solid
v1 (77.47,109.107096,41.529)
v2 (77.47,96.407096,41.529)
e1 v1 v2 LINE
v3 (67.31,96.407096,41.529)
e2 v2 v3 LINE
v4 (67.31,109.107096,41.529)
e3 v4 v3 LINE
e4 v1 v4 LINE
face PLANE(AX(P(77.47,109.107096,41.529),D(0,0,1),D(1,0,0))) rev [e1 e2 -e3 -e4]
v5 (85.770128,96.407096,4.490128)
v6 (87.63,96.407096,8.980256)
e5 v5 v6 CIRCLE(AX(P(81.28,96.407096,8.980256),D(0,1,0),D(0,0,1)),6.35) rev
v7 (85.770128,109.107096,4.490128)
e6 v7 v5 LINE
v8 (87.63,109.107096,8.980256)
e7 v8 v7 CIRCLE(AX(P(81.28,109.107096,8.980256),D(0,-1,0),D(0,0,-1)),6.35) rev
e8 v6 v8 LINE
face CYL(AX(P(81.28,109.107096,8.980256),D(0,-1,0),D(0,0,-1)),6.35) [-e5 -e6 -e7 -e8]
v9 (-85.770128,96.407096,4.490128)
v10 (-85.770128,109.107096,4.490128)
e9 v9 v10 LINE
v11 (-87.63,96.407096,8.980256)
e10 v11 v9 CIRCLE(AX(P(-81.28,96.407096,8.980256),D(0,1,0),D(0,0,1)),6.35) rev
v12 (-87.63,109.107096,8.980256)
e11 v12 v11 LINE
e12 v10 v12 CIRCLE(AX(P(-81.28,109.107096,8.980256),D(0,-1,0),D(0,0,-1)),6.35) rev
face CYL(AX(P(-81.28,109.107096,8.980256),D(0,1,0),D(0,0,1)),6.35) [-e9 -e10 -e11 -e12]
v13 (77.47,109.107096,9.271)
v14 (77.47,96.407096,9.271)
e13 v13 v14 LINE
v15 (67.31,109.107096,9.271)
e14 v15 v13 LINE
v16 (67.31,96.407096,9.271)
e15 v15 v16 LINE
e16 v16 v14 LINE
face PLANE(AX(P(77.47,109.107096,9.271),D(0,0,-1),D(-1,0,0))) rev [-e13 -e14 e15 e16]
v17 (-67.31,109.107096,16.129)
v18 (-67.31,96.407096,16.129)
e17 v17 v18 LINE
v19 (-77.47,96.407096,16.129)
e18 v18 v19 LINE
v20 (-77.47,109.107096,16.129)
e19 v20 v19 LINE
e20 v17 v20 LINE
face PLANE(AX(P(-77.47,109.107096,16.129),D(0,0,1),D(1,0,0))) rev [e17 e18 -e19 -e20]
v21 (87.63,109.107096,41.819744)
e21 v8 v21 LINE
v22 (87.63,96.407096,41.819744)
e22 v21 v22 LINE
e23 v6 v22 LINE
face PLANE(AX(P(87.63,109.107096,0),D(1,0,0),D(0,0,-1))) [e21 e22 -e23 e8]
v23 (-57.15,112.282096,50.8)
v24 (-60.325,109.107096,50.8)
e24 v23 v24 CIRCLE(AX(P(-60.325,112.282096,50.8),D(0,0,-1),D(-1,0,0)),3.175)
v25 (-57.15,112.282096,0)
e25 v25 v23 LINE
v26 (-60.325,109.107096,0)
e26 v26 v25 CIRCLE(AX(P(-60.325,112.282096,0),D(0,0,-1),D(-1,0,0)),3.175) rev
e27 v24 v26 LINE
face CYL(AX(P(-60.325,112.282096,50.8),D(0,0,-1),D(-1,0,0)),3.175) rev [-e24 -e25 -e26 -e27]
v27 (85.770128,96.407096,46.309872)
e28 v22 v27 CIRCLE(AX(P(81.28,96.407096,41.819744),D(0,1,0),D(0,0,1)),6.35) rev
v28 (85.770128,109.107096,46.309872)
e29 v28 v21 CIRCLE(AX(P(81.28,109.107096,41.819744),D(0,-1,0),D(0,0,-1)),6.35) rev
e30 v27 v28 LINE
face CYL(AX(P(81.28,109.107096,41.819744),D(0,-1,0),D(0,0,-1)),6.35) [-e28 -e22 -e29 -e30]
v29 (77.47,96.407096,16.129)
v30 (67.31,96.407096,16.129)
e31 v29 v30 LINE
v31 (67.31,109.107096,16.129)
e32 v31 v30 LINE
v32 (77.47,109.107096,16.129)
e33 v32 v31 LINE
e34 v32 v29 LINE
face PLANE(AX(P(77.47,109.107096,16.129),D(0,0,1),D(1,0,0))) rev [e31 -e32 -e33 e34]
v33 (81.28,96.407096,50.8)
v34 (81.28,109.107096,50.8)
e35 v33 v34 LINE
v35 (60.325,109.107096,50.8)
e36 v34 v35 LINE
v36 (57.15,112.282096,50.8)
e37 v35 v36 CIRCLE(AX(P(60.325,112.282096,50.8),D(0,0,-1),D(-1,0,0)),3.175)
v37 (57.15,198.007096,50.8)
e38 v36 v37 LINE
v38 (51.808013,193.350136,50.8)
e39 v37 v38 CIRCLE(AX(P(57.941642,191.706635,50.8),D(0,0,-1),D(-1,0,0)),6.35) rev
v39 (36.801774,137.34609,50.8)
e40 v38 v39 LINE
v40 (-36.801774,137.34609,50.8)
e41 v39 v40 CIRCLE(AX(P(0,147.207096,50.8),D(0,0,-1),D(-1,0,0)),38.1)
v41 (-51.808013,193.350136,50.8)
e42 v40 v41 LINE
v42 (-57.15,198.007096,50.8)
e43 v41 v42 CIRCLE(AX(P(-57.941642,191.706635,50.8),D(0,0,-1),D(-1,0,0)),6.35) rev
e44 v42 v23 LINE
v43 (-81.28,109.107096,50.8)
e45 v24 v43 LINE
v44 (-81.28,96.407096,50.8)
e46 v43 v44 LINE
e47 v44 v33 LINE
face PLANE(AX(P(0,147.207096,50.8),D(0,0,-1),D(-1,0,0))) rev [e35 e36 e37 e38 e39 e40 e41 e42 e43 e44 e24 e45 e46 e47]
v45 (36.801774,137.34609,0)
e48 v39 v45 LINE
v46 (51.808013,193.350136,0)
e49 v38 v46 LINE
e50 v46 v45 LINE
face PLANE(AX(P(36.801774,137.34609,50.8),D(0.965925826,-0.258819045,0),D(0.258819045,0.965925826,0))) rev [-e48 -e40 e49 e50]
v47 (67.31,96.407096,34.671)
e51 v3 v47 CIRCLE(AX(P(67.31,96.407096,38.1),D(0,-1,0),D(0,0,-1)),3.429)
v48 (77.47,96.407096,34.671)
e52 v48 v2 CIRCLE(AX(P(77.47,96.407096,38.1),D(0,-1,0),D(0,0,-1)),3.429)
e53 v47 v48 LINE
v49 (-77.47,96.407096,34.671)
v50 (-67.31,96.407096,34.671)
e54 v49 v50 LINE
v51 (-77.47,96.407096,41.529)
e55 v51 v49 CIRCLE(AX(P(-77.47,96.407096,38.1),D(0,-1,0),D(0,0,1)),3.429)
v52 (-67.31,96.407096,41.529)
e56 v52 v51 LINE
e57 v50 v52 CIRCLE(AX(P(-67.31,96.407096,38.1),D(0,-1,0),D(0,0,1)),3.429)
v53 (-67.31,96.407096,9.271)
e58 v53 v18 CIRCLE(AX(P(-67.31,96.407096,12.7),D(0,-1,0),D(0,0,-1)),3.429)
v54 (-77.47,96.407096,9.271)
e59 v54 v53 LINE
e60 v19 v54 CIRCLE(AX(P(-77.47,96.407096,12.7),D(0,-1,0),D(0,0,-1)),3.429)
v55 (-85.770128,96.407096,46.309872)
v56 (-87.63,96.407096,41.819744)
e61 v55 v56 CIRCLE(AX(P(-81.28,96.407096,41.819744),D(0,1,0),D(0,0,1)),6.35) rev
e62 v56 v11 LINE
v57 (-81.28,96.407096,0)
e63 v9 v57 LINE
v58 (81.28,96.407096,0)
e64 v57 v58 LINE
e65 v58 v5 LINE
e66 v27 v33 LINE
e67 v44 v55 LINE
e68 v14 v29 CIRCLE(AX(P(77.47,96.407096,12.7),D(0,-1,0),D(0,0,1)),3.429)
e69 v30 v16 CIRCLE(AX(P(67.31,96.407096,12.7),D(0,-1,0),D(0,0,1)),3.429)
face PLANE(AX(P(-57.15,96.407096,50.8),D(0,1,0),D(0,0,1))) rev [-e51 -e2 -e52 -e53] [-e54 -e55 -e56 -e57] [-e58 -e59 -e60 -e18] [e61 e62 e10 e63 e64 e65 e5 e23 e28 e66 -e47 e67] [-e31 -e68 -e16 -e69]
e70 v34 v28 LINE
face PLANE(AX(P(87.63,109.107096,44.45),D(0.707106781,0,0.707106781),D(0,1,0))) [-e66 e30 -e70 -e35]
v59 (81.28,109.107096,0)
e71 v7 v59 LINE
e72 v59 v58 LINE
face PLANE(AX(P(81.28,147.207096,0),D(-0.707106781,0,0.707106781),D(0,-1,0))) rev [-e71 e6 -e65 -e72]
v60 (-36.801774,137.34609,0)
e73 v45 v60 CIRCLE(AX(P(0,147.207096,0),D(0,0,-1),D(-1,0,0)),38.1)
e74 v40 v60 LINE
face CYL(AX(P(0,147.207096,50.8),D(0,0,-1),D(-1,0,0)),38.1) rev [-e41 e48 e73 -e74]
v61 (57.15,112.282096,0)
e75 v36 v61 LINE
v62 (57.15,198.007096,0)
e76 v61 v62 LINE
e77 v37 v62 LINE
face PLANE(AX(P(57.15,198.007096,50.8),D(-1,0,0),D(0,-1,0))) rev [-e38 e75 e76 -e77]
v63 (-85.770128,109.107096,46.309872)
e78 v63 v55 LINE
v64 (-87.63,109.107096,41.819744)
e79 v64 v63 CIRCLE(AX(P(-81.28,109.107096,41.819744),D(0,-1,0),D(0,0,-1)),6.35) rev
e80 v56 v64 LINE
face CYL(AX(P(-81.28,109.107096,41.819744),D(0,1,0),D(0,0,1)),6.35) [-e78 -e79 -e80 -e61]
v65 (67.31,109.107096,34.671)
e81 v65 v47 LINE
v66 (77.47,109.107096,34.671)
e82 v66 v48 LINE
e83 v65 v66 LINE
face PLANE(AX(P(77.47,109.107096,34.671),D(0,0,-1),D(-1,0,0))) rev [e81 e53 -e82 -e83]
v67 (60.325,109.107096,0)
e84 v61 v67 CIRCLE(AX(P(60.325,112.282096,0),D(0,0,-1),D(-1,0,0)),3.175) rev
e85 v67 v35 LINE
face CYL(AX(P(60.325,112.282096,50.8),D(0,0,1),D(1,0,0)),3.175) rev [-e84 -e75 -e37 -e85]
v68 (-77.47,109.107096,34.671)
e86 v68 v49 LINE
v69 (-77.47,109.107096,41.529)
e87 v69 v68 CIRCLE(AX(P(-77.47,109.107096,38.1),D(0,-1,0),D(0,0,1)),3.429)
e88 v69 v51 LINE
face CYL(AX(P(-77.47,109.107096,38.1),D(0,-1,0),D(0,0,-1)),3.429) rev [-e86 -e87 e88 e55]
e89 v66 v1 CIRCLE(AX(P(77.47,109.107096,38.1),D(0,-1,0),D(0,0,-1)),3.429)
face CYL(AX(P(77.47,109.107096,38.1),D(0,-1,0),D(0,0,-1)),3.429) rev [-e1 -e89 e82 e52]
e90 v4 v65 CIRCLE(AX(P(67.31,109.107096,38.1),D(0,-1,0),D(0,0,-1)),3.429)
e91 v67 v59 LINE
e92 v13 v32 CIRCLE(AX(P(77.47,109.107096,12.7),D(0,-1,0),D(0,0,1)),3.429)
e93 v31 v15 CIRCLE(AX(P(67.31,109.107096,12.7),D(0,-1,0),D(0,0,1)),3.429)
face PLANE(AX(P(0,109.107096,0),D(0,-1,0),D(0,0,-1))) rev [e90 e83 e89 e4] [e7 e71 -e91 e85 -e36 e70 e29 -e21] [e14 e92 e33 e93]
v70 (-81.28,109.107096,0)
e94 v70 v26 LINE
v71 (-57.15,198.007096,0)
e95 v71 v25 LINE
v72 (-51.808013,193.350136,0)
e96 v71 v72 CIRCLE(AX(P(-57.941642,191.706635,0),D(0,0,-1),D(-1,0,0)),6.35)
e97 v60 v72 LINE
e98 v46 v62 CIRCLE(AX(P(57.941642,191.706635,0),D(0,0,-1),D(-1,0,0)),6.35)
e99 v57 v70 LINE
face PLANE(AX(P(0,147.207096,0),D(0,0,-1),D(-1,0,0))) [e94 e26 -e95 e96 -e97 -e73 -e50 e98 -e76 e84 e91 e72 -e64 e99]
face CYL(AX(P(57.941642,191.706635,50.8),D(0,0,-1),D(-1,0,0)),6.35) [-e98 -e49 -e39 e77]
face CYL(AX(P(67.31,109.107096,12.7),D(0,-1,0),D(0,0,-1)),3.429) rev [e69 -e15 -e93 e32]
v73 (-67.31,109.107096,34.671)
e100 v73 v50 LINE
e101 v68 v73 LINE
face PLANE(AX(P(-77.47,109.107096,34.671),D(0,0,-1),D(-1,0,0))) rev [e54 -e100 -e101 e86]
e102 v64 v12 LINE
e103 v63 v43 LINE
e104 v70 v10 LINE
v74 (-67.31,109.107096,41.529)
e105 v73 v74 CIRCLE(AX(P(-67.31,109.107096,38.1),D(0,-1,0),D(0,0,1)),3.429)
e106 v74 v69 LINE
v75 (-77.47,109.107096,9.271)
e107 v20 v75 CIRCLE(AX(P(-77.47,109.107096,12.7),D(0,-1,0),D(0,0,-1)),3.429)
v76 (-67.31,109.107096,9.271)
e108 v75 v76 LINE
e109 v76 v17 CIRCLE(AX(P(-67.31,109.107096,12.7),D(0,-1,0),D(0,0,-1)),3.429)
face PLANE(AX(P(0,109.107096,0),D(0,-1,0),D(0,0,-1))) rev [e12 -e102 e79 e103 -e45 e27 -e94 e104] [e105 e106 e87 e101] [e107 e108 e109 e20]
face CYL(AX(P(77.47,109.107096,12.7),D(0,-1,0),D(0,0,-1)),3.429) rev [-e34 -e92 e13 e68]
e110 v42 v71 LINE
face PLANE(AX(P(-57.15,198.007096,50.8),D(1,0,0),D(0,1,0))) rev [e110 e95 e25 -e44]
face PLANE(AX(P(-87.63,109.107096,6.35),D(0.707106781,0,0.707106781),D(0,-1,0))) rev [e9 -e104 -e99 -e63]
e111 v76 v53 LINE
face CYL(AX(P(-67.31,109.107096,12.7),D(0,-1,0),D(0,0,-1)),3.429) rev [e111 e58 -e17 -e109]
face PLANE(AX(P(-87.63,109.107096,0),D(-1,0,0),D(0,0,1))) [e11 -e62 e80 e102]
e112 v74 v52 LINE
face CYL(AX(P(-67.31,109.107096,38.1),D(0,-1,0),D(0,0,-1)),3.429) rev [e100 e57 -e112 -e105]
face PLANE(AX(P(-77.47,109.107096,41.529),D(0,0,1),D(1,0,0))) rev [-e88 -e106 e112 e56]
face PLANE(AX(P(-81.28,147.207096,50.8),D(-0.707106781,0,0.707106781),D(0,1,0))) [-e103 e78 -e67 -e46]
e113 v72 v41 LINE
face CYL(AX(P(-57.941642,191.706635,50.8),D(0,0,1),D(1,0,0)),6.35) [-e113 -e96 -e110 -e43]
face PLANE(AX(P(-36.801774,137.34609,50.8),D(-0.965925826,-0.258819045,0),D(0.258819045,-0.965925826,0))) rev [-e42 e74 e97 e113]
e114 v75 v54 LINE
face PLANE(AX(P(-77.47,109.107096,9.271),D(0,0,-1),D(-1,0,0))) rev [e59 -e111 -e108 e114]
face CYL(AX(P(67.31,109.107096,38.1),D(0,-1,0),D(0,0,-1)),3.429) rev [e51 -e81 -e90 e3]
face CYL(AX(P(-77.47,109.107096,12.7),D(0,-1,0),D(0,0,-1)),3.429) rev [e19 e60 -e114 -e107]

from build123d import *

# Parameters (mm, degrees)
BOSS_EXTRUDE1_DEPTH = 50.8
SKETCH2_W           = 30.48
SKETCH2_H           = 50.8
BOSS_EXTRUDE2_DEPTH = 12.7
FILLET1_R           = 3.175
CHAMFER1_SIZE       = 6.35
FILLET2_R           = 6.35
FILLET3_R           = 6.35


with BuildPart() as part:
    # Sketch1 → Boss-Extrude1 (new body)
    with BuildSketch(Plane.XY):
        with BuildLine():
            Line((-36.801773982, 137.346090308), (-53.055841449, 198.007095926))
            Line((-53.055841449, 198.007095926), (-57.15, 198.007095926))
            Line((-57.15, 198.007095926), (-57.15, 96.407095926))
            Line((-57.15, 96.407095926), (57.15, 96.407095926))
            Line((57.15, 96.407095926), (57.15, 198.007095926))
            Line((57.15, 198.007095926), (53.055841449, 198.007095926))
            Line((53.055841449, 198.007095926), (36.801773982, 137.346090308))
            ThreePointArc((36.801773982, 137.346090308), (0, 109.107095926), (-36.801773982, 137.346090308))
        make_face()
    extrude(amount=BOSS_EXTRUDE1_DEPTH)

    # Sketch2 → Boss-Extrude2 (add)
    # profile 1 of 2: a face of its own
    with BuildSketch(Plane.XZ.offset(-96.407095926)):
        with Locations((-72.39, 25.4)):
            Rectangle(SKETCH2_W, SKETCH2_H)
        with BuildLine():
            Line((-77.47, 16.129), (-67.31, 16.129))
            ThreePointArc((-67.31, 16.129), (-63.881, 12.7), (-67.31, 9.271))
            Line((-67.31, 9.271), (-77.47, 9.271))
            ThreePointArc((-77.47, 9.271), (-80.899, 12.7), (-77.47, 16.129))
        make_face(mode=Mode.SUBTRACT)
        with BuildLine():
            Line((-77.47, 34.671), (-67.31, 34.671))
            ThreePointArc((-67.31, 34.671), (-63.881, 38.1), (-67.31, 41.529))
            Line((-67.31, 41.529), (-77.47, 41.529))
            ThreePointArc((-77.47, 41.529), (-80.899, 38.1), (-77.47, 34.671))
        make_face(mode=Mode.SUBTRACT)
    # profile 2 of 2: a face of its own
    with BuildSketch(Plane.XZ.offset(-96.407095926)):
        with Locations((72.39, 25.4)):
            Rectangle(SKETCH2_W, SKETCH2_H)
        with BuildLine():
            Line((77.47, 34.671), (67.31, 34.671))
            ThreePointArc((67.31, 34.671), (63.881, 38.1), (67.31, 41.529))
            Line((67.31, 41.529), (77.47, 41.529))
            ThreePointArc((77.47, 41.529), (80.899, 38.1), (77.47, 34.671))
        make_face(mode=Mode.SUBTRACT)
        with BuildLine():
            Line((77.47, 16.129), (67.31, 16.129))
            ThreePointArc((67.31, 16.129), (63.881, 12.7), (67.31, 9.271))
            Line((67.31, 9.271), (77.47, 9.271))
            ThreePointArc((77.47, 9.271), (80.899, 12.7), (77.47, 16.129))
        make_face(mode=Mode.SUBTRACT)
    extrude(amount=-BOSS_EXTRUDE2_DEPTH)

    # Fillet1
    fillet1_edges = [part.edges().sort_by_distance(p)[0] for p in [
        (-57.15, 109.107095926, 25.4),
        (57.15, 109.107095926, 25.4),
    ]]
    fillet(fillet1_edges, radius=FILLET1_R)

    # Chamfer1
    chamfer1_edges = [part.edges().sort_by_distance(p)[0] for p in [
        (-87.63, 102.757095926, 0),
        (-87.63, 102.757095926, 50.8),
        (87.63, 102.757095926, 0),
        (87.63, 102.757095926, 50.8),
    ]]
    chamfer(chamfer1_edges, length=CHAMFER1_SIZE)

    # Fillet2
    fillet2_edges = [part.edges().sort_by_distance(p)[0] for p in [
        (87.63, 102.757095926, 6.35),
        (87.63, 102.757095926, 44.45),
        (-87.63, 102.757095926, 44.45),
        (-87.63, 102.757095926, 6.35),
    ]]
    fillet(fillet2_edges, radius=FILLET2_R)

    # Fillet3
    # the kernel refuses this fillet: 6.35 mm, written as the material it takes off along each edge
    with BuildSketch(Plane(origin=(53.055841449, 198.007095926, -12.053098402), x_dir=(-0.2588190451025212, -0.9659258262890681, 0), z_dir=(0, 0, 1))) as fillet3_piece_1:
        with BuildLine():
            CenterArc((4.821239361, 6.35), FILLET3_R, 202.161584325, 67.838415675)
            Line((-1.059646207, 3.954653481), (-1.177263918, 3.906746551))
            ThreePointArc((-1.177263918, 3.906746551), (-0.652495683, 1.944456722), (-0.12267258, -0.032870019))
            Line((-0.12267258, -0.032870019), (0, -0.127))
            Line((0, -0.127), (4.821239361, -0.127))
            Line((4.821239361, -0.127), (4.821239361, 0))
        make_face()
    extrude(amount=74.906196803, mode=Mode.SUBTRACT)
    with BuildSketch(Plane(origin=(-53.055841449, 198.007095926, -12.053098402), x_dir=(-1, 0, 0), z_dir=(0, 0, 1))) as fillet3_piece_2:
        with BuildLine():
            CenterArc((4.885800429, 6.30046055), FILLET3_R, 195, 67.838415675)
            Line((-1.247828568, 4.656959613), (-1.370501147, 4.624089594))
            Line((-1.370501147, 4.624089594), (-0.12267258, -0.032870019))
            Line((-0.12267258, -0.032870019), (0, -0.127))
            ThreePointArc((0, -0.127), (2.047079275, -0.127), (4.078325713, -0.126009211))
            Line((4.078325713, -0.126009211), (4.094158551, 0))
        make_face()
    extrude(amount=74.906196803, mode=Mode.SUBTRACT)


solid = part.part
